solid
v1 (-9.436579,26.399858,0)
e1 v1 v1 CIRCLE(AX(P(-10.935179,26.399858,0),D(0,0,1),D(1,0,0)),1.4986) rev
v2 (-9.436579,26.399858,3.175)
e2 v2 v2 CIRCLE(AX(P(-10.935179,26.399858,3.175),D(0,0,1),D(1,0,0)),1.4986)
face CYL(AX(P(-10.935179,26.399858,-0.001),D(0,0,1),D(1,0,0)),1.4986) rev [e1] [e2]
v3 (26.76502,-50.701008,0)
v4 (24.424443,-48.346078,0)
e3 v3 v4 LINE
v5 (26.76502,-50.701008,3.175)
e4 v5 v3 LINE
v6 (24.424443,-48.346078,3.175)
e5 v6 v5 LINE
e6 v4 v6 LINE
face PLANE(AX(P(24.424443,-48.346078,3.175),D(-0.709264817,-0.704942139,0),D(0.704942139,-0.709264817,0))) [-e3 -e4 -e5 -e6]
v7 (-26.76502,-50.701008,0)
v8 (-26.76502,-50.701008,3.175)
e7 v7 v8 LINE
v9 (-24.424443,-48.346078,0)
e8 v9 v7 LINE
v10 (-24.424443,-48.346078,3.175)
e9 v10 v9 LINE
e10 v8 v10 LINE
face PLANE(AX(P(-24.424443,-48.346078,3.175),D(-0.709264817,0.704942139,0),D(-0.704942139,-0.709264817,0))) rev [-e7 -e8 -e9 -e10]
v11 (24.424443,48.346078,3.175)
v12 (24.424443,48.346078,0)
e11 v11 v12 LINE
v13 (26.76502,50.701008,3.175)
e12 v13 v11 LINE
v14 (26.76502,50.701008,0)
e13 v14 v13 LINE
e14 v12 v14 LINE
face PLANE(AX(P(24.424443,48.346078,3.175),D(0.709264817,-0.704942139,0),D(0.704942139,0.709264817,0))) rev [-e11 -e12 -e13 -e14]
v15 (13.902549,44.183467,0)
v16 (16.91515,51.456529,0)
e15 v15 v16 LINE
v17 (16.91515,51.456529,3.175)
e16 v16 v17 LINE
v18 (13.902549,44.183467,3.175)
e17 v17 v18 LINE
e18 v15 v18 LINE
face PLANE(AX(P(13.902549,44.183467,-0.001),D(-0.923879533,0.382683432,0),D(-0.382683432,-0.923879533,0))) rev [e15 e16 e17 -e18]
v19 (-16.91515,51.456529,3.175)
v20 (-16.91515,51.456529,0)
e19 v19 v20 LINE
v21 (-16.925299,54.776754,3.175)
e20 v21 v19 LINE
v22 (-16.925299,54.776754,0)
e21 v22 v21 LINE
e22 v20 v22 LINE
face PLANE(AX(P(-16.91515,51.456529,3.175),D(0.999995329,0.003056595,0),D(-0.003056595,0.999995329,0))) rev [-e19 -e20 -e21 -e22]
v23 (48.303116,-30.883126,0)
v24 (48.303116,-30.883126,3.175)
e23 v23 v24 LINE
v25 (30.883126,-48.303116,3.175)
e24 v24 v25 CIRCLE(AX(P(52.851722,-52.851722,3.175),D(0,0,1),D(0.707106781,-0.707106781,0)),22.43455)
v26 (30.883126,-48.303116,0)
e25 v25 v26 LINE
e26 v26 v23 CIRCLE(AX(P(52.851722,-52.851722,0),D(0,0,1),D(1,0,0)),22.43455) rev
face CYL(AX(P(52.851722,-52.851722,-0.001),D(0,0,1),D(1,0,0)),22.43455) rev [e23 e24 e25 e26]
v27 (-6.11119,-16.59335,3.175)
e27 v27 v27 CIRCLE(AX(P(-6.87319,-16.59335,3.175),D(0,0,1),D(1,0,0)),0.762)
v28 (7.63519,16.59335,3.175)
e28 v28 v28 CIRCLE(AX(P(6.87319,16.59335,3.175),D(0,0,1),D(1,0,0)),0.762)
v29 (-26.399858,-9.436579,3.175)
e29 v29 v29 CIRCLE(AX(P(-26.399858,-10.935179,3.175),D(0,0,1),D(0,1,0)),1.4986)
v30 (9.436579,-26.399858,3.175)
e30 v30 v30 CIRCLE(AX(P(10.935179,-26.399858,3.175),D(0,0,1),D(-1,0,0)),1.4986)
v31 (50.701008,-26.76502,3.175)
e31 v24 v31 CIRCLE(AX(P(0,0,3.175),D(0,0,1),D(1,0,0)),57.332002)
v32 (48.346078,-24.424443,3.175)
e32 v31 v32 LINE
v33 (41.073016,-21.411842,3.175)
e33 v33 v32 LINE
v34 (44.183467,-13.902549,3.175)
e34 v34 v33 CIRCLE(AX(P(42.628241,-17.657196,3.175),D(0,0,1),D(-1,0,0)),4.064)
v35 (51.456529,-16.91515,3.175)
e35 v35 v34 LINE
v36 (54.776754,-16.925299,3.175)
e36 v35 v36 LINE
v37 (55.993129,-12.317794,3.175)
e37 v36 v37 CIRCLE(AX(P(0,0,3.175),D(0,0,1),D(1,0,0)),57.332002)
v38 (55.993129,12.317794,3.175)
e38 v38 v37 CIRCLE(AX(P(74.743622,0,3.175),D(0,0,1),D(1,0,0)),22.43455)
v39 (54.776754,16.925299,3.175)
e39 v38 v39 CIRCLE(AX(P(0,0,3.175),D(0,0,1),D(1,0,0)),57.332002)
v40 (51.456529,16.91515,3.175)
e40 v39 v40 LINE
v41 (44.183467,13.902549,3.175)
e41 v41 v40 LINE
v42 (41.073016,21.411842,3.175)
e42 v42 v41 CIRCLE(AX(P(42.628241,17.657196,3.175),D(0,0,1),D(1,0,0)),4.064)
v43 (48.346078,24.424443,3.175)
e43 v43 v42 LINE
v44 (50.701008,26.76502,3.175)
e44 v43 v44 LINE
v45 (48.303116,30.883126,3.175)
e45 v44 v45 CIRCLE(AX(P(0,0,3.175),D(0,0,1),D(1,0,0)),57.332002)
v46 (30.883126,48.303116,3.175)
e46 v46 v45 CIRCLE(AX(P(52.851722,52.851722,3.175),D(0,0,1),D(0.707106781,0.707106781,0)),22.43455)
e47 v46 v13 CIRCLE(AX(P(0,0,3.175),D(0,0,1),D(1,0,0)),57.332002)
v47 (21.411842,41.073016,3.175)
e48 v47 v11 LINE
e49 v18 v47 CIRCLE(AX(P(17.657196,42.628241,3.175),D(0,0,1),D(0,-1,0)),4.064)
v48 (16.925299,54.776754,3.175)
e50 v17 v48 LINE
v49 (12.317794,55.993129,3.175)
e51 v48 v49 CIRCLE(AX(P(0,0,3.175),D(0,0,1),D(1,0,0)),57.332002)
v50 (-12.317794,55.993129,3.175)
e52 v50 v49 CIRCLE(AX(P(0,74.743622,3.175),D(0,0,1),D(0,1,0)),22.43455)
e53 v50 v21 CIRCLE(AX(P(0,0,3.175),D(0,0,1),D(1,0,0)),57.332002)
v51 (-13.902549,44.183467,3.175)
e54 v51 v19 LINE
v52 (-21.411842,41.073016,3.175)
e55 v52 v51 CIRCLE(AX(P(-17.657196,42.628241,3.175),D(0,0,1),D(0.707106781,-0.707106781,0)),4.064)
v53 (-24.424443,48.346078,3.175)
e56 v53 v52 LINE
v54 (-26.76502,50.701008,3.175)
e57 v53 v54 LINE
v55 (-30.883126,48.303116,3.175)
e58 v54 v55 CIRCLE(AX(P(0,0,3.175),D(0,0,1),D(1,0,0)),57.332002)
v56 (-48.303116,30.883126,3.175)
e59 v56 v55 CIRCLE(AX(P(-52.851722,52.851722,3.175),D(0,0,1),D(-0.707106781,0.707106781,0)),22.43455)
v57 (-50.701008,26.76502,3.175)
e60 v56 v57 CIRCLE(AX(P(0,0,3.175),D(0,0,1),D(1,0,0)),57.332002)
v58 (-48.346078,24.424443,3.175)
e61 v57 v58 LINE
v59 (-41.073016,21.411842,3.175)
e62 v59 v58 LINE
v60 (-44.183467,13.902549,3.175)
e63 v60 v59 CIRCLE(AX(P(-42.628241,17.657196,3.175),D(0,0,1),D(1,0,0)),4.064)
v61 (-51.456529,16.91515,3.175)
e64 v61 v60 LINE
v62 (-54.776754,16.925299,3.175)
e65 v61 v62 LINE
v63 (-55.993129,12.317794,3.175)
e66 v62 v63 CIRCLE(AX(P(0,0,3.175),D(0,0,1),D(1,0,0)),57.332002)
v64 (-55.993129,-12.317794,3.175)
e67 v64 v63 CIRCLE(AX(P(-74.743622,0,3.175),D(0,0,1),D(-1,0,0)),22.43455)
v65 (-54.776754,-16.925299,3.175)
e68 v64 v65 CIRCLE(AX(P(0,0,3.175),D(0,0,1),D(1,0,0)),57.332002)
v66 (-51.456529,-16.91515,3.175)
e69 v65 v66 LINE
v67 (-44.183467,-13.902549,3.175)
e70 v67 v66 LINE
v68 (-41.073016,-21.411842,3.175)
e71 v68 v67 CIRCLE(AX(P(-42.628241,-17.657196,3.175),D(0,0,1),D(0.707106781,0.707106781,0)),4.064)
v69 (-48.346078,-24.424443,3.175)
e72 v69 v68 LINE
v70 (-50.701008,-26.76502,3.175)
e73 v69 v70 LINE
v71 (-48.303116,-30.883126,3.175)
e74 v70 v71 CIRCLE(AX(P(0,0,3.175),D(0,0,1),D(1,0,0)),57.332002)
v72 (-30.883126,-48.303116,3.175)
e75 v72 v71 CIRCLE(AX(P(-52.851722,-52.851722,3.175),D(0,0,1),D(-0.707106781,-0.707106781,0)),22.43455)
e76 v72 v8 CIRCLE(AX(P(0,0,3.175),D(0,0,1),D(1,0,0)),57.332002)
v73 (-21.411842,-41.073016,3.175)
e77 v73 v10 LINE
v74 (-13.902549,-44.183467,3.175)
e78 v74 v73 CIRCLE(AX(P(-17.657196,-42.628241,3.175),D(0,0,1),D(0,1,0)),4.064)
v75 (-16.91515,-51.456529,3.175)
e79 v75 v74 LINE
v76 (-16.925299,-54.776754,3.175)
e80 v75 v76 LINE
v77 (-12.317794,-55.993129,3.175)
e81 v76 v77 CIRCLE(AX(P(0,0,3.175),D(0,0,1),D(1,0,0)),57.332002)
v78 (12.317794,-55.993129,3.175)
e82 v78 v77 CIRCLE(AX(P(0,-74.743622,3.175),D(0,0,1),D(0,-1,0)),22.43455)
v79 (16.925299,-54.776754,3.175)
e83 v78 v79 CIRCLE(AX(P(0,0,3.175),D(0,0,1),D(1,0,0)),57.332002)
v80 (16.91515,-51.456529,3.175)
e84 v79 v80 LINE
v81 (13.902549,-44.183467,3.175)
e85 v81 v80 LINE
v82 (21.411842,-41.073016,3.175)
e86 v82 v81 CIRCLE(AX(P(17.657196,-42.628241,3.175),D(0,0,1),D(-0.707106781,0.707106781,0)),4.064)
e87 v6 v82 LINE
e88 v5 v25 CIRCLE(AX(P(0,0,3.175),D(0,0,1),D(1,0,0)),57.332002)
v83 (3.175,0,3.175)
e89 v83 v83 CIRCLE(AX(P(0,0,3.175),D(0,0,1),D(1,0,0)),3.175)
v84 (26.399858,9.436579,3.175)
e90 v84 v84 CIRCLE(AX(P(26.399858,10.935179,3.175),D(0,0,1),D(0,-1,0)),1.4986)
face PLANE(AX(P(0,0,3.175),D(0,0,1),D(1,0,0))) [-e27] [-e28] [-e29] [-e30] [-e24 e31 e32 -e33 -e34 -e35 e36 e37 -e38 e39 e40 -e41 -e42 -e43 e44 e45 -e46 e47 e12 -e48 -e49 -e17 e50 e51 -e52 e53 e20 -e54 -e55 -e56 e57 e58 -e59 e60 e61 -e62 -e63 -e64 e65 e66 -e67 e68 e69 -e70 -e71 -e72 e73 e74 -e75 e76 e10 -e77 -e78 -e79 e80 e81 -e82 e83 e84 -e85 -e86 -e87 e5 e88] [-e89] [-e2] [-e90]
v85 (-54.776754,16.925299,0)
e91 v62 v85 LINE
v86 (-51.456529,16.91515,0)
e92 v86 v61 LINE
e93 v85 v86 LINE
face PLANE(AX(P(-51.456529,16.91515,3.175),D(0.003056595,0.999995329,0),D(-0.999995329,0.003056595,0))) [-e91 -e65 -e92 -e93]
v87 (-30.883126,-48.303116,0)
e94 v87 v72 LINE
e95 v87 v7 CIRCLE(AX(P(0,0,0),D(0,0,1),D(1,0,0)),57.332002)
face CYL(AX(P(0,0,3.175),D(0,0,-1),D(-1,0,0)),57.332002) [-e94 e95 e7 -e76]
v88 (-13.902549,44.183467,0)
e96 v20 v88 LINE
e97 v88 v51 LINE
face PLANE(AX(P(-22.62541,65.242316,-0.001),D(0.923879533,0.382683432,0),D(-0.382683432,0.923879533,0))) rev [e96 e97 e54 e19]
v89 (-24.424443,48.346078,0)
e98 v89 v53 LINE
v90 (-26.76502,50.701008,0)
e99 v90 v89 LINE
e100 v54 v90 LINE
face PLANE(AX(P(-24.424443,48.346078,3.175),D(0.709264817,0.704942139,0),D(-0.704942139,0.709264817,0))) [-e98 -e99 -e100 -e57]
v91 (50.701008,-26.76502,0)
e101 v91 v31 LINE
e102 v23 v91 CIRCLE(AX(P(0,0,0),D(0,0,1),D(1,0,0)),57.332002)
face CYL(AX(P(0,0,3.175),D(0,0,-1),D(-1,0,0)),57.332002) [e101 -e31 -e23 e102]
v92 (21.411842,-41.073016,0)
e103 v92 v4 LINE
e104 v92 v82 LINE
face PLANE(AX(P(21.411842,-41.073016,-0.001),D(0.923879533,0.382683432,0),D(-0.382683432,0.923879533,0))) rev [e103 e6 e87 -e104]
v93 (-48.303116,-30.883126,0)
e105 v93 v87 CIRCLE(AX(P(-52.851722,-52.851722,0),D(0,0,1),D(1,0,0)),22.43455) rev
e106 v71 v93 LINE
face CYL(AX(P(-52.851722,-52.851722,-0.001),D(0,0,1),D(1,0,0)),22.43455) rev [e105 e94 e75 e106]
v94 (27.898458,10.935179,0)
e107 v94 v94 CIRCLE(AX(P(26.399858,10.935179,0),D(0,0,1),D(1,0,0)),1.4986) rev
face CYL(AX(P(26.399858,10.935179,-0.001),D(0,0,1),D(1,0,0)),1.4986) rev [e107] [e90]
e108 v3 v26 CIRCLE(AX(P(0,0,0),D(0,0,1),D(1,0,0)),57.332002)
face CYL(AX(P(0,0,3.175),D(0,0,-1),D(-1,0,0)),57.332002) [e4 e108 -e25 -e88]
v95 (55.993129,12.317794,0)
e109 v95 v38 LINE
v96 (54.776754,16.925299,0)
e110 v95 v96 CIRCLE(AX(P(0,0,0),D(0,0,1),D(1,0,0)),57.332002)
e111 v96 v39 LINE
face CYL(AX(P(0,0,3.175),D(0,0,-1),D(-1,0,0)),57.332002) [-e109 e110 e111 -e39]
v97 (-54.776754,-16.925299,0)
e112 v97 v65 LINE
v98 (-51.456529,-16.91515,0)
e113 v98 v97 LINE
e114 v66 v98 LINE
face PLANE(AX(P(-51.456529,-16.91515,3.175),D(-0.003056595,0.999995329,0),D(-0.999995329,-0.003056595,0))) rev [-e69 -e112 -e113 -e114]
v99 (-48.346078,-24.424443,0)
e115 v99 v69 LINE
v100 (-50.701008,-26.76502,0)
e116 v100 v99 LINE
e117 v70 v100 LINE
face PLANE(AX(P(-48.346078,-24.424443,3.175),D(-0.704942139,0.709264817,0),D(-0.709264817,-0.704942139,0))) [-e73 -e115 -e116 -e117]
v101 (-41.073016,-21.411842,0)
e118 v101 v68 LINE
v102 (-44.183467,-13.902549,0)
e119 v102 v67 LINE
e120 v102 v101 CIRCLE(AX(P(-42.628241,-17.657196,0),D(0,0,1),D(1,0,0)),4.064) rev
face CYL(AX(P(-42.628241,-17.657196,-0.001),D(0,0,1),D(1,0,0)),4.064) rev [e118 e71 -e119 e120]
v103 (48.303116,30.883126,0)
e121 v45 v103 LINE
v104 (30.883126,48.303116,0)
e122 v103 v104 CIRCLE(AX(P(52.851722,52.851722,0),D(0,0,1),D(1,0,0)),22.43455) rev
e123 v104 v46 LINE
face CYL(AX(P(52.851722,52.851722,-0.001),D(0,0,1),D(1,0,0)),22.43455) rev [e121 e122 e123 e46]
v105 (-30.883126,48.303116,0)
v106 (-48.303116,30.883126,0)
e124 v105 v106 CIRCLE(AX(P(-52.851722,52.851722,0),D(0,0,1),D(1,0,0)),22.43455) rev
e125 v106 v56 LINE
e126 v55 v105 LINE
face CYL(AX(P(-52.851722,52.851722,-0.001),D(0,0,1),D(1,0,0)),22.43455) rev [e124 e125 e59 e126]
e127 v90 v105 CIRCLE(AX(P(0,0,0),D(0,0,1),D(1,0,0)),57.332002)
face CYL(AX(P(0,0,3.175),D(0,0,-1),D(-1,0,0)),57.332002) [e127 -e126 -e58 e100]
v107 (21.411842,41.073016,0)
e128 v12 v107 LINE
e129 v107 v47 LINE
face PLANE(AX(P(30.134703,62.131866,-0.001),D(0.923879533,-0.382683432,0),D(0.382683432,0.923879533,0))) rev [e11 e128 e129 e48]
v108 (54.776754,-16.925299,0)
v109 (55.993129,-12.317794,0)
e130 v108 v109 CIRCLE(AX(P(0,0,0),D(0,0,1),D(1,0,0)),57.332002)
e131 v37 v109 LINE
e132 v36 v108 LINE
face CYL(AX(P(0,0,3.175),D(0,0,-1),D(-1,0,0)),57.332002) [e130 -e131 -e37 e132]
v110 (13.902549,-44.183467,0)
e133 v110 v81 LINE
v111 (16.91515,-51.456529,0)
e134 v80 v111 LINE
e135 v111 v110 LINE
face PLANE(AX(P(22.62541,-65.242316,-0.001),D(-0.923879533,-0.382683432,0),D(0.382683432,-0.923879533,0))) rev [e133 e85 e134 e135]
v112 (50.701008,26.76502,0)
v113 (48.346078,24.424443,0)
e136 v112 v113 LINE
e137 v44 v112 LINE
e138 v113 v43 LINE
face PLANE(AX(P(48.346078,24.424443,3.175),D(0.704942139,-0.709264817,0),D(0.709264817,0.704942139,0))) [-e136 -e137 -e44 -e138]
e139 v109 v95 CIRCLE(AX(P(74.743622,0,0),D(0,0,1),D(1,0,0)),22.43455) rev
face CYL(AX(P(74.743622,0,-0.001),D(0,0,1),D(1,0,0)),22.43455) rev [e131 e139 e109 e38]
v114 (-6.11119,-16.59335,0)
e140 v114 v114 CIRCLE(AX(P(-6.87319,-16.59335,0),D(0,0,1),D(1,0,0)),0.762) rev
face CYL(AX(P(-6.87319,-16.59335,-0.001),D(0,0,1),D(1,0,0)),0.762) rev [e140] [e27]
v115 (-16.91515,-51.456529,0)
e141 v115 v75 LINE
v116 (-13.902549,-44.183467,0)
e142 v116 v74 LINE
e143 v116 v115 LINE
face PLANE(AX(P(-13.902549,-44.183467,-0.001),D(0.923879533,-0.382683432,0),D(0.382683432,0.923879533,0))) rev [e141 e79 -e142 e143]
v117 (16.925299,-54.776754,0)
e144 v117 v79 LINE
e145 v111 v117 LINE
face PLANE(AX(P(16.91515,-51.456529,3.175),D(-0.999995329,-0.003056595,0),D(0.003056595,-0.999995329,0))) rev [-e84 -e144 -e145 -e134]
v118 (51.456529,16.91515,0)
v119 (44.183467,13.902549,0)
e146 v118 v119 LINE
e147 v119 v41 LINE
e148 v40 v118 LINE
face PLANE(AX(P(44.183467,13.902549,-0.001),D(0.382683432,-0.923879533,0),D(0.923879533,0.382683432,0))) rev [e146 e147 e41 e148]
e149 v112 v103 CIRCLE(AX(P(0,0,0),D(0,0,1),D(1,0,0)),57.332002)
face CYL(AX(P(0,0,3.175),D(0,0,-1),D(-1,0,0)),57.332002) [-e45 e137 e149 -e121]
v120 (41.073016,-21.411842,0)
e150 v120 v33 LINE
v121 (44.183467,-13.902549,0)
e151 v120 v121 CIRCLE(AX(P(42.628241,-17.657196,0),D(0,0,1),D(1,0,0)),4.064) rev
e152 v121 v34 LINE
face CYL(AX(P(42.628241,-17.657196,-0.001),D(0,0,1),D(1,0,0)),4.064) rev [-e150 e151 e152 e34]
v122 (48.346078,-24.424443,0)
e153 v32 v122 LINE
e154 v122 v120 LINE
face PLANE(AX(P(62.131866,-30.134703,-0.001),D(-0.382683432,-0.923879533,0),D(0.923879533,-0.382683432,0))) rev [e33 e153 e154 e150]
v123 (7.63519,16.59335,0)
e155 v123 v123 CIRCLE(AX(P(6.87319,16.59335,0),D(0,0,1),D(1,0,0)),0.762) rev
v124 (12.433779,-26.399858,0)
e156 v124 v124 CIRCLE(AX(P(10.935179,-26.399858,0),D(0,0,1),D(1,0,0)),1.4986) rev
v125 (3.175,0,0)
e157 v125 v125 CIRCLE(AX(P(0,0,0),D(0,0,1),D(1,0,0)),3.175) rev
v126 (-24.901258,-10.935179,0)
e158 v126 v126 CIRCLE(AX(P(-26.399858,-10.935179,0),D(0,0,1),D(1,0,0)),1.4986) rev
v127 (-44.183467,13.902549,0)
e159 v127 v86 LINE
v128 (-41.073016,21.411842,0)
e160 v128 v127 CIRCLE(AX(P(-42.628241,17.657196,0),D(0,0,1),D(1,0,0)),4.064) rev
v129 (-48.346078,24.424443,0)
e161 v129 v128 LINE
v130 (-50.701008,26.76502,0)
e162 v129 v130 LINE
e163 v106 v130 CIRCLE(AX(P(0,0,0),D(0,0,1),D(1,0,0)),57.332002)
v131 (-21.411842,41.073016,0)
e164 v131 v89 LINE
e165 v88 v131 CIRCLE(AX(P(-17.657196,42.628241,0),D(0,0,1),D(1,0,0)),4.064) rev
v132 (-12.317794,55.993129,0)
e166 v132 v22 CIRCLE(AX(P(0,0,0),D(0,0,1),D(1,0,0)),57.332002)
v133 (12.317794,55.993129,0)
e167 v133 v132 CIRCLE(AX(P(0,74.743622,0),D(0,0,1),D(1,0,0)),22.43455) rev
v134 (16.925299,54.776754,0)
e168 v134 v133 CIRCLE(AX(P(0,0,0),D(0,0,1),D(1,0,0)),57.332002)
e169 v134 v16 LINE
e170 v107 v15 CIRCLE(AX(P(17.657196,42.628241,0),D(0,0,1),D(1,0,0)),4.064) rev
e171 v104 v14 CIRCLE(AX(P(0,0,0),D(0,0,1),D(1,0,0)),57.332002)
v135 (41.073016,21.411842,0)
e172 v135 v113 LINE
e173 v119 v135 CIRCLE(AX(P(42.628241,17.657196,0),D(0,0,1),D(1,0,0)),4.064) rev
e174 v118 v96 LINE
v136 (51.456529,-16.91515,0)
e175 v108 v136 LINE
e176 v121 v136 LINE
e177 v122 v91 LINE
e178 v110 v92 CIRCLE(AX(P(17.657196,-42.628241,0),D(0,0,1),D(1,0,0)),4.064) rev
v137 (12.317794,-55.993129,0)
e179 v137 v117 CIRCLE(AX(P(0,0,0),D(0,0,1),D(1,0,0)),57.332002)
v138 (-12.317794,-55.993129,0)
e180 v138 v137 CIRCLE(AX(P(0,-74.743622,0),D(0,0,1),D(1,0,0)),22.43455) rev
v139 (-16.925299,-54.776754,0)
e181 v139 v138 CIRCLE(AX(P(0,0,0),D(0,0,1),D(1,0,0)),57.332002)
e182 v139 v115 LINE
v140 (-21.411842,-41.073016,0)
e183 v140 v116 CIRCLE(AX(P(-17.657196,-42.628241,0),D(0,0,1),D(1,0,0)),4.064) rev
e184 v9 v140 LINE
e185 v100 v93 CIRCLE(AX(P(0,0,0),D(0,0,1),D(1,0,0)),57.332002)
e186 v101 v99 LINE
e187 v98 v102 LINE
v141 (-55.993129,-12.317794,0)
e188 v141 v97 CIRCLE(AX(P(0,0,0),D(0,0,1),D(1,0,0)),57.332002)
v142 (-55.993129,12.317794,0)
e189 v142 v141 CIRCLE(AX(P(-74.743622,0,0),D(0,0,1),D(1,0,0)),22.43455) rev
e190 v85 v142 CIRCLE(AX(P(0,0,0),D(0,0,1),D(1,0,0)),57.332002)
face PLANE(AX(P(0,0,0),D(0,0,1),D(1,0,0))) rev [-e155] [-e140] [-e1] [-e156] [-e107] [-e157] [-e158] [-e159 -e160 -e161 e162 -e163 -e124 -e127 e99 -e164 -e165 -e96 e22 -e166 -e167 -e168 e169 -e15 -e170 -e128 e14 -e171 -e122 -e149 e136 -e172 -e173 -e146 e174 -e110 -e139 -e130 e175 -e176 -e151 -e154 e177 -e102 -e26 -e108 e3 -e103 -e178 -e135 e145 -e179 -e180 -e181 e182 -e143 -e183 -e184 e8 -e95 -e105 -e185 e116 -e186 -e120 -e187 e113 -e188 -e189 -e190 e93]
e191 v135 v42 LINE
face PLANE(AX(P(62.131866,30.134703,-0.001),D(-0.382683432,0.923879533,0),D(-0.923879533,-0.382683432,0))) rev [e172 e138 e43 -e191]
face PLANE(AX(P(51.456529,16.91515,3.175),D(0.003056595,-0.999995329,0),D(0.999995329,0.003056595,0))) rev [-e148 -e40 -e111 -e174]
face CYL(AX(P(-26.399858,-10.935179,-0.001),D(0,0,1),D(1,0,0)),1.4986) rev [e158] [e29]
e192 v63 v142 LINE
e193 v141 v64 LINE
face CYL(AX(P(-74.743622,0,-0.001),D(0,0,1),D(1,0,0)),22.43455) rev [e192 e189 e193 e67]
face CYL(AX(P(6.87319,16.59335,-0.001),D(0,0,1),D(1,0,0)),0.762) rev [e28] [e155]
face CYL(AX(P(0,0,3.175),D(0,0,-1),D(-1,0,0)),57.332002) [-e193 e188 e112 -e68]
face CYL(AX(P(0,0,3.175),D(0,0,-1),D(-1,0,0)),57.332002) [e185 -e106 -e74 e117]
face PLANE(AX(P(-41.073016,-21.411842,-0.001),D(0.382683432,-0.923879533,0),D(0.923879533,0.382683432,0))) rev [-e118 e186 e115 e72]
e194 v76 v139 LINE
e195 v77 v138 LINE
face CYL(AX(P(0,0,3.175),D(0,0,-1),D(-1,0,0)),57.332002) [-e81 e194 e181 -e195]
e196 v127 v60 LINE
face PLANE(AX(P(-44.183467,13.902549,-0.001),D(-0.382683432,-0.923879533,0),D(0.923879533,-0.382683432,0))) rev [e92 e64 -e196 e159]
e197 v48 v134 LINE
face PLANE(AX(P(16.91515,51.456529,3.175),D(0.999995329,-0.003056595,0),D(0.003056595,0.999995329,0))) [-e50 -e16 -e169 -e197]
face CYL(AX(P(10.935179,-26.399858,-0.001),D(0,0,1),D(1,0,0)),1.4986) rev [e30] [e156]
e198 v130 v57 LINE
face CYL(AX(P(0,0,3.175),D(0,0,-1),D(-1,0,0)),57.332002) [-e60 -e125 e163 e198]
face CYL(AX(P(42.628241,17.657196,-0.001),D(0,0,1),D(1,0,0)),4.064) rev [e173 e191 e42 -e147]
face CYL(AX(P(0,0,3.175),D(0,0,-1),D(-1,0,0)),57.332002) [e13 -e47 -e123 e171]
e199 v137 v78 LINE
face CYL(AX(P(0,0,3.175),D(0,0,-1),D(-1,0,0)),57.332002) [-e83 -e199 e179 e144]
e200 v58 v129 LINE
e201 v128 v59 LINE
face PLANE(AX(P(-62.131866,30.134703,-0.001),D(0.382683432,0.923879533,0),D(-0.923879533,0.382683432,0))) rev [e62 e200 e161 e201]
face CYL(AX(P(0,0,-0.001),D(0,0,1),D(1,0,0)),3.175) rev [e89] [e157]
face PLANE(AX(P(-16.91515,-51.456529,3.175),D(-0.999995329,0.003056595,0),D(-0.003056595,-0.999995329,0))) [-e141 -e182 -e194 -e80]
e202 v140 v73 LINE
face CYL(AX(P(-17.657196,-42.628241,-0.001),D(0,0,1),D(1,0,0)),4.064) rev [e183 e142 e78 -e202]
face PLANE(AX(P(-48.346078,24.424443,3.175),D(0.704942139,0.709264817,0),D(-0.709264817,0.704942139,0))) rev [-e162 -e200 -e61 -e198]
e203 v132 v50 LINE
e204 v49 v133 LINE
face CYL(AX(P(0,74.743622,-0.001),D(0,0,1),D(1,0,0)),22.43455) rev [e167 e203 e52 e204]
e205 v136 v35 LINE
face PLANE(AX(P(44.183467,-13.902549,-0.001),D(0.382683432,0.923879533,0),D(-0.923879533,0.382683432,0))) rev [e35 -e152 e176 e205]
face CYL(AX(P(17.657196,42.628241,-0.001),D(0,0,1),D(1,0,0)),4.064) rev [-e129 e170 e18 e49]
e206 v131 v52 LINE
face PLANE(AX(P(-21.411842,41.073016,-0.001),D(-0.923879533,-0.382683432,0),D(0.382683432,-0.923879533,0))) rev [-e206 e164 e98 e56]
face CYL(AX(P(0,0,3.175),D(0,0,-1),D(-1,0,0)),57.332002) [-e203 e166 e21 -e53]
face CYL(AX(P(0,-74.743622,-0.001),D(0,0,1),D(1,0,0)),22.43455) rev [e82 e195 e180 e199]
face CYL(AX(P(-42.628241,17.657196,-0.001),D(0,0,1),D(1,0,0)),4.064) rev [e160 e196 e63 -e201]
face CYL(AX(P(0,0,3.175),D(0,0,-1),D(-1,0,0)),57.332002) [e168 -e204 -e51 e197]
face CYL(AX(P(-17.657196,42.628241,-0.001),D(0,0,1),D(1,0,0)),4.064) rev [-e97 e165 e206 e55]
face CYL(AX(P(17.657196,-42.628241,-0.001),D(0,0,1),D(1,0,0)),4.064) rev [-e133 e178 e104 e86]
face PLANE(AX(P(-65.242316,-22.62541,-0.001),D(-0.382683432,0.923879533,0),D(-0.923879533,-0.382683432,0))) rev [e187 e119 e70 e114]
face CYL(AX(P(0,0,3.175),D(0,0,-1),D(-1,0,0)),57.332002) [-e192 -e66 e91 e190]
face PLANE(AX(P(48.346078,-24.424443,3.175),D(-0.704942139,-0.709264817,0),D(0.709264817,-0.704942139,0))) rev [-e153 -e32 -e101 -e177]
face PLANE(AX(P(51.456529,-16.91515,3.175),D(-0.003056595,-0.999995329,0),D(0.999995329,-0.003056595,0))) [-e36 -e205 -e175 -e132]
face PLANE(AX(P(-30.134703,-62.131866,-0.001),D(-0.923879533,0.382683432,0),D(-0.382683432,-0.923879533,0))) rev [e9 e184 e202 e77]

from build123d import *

# Parameters (mm, degrees)
SKETCH1_R           = 57.332002373
BOSS_EXTRUDE1_DEPTH = 3.175
CUT_EXTRUDE1_START  = -3.175
CUT_EXTRUDE1_DEPTH  = 3.175
CIRPATTERN1_COUNT   = 8
CUT_EXTRUDE2_REACH  = 81.25
SKETCH3_R           = 3.175
CUT_EXTRUDE3_REACH  = 81.25
SKETCH4_R           = 0.762
CHAMFER1_SIZE       = 3.175
CUT_EXTRUDE4_REACH  = 81.25
SKETCH5_R           = 1.4986
CIRPATTERN2_COUNT   = 4


with BuildPart() as part:
    # Sketch1 → Boss-Extrude1 (new body)
    with BuildSketch(Plane.XY):
        Circle(SKETCH1_R)
    extrude(amount=BOSS_EXTRUDE1_DEPTH)

    # Sketch2 → Cut-Extrude1 (cut)
    with BuildSketch(Plane.XY.offset(3.175).offset(CUT_EXTRUDE1_START)):
        with BuildLine():
            Line((62.131865528, 30.134703259), (41.073015989, 21.411842172))
            ThreePointArc((41.073015989, 21.411842172), (38.873595038, 16.101970283), (44.183466927, 13.902549332))
            Line((44.183466927, 13.902549332), (54.389846688, 18.130170251))
            ThreePointArc((54.389846688, 18.130170251), (55.267949497, 15.245073122), (55.99312865, 12.317793637))
            ThreePointArc((55.99312865, 12.317793637), (52.309071806, 0), (55.99312865, -12.317793637))
            ThreePointArc((55.99312865, -12.317793637), (55.267949497, -15.245073122), (54.389846688, -18.130170251))
            Line((54.389846688, -18.130170251), (44.183466927, -13.902549332))
            ThreePointArc((44.183466927, -13.902549332), (38.873595038, -16.101970283), (41.073015989, -21.411842172))
            Line((41.073015989, -21.411842172), (62.131865528, -30.134703259))
            ThreePointArc((62.131865528, -30.134703259), (69.054102373, 0), (62.131865528, 30.134703259))
        make_face()
    cut_extrude1 = extrude(amount=CUT_EXTRUDE1_DEPTH, mode=Mode.SUBTRACT)

    # CirPattern1: Cut-Extrude1 ×8 about axis
    cirpattern1_axis = Axis((0, 0, 0), (0, 0, 1))
    for i in range(1, CIRPATTERN1_COUNT):
        add(cut_extrude1.rotate(cirpattern1_axis, i * 360 / CIRPATTERN1_COUNT), mode=Mode.SUBTRACT)

    # Sketch3 → Cut-Extrude2 (cut, up to next)
    with BuildSketch(Plane.XY.offset(3.175), mode=Mode.PRIVATE) as cut_extrude2_sk1:
        Circle(SKETCH3_R)
    cut_extrude2_tool1 = extrude(cut_extrude2_sk1.sketch, amount=-CUT_EXTRUDE2_REACH, mode=Mode.PRIVATE) & part.part
    add(cut_extrude2_tool1.solids().sort_by_distance((0, 0, 3.175))[0], mode=Mode.SUBTRACT)

    # Sketch4 → Cut-Extrude3 (cut, up to next)
    with BuildSketch(Plane.XY.offset(3.175), mode=Mode.PRIVATE) as cut_extrude3_sk1:
        with Locations((6.873190472, 16.593349654)):
            Circle(SKETCH4_R)
    cut_extrude3_tool1 = extrude(cut_extrude3_sk1.sketch, amount=-CUT_EXTRUDE3_REACH, mode=Mode.PRIVATE) & part.part
    # Sketch4 → Cut-Extrude3 (cut, up to next)
    with BuildSketch(Plane.XY.offset(3.175), mode=Mode.PRIVATE) as cut_extrude3_sk2:
        with Locations((-6.873190472, -16.593349654)):
            Circle(SKETCH4_R)
    cut_extrude3_tool2 = extrude(cut_extrude3_sk2.sketch, amount=-CUT_EXTRUDE3_REACH, mode=Mode.PRIVATE) & part.part
    add(cut_extrude3_tool1.solids().sort_by_distance((6.87319, 16.59335, 3.175))[0], mode=Mode.SUBTRACT)
    add(cut_extrude3_tool2.solids().sort_by_distance((-6.87319, -16.59335, 3.175))[0], mode=Mode.SUBTRACT)

    # Chamfer1
    # the kernel refuses this chamfer: 3.175, 1.27 mm, written as the material it takes off along each edge
    with BuildSketch(Plane(origin=(-51.279395749, 25.639463092, -8.232085276), x_dir=(0.4570542890286377, 0.8894387988392043, 0), z_dir=(0, 0, 1)), Plane(origin=(-18.130170251, 54.389846688, -8.232085276), x_dir=(0.9521143932521638, 0.3057420189670758, 0), z_dir=(0, 0, 1)), Plane(origin=(25.639463092, 51.279395749, -8.232085276), x_dir=(0.8894387988392037, -0.4570542890286388, 0), z_dir=(0, 0, 1)), Plane(origin=(54.389846688, 18.130170251, -8.232085276), x_dir=(0.30574201896707504, -0.9521143932521642, 0), z_dir=(0, 0, 1)), Plane(origin=(25.639463092, -51.279395749, 11.407085276), x_dir=(0.8894387988391999, 0.45705428902864664, 0), z_dir=(0, 0, -1)), Plane(origin=(-18.130170251, -54.389846688, 11.407085276), x_dir=(0.952114393252168, -0.305742018967063, 0), z_dir=(0, 0, -1)), Plane(origin=(-51.279395749, -25.639463092, 11.407085276), x_dir=(0.4570542890286467, -0.8894387988391996, 0), z_dir=(0, 0, -1))) as chamfer1_piece_1:
        with BuildLine():
            Line((1.265469022, 0), (CHAMFER1_SIZE * 0.0818896104616, -CHAMFER1_SIZE * 0.996641405772))
            Line((CHAMFER1_SIZE * 0.0818896104616, -CHAMFER1_SIZE * 0.996641405772), (0, 0))
            ThreePointArc((0, 0), (0.65194513, 0.003488419), (1.265469022, 0))
        make_face()
    extrude(amount=19.639170553, mode=Mode.SUBTRACT)
    with BuildSketch(Plane(origin=(-54.389846688, 18.130170251, 11.407085276), x_dir=(0.9238795325112874, -0.3826834323650885, 0), z_dir=(0, 0, -1)), Plane(origin=(-25.639463092, 51.279395749, 11.407085276), x_dir=(0.3826834323650902, -0.9238795325112866, 0), z_dir=(0, 0, -1)), Plane(origin=(18.130170251, 54.389846688, 11.407085276), x_dir=(-0.3826834323650892, -0.923879532511287, 0), z_dir=(0, 0, -1)), Plane(origin=(51.279395749, 25.639463092, 11.407085276), x_dir=(-0.9238795325112859, -0.38268343236509195, 0), z_dir=(0, 0, -1)), Plane(origin=(18.130170251, -54.389846688, -8.232085276), x_dir=(-0.38268343236509117, 0.9238795325112862, 0), z_dir=(0, 0, 1)), Plane(origin=(-25.639463092, -51.279395749, -8.232085276), x_dir=(0.3826834323650892, 0.923879532511287, 0), z_dir=(0, 0, 1)), Plane(origin=(-54.389846688, -18.130170251, -8.232085276), x_dir=(0.9238795325112866, 0.3826834323650902, 0), z_dir=(0, 0, 1))) as chamfer1_piece_2:
        with BuildLine():
            Line((CHAMFER1_SIZE, 0), (0.103628765, 1.261218825))
            ThreePointArc((0.103628765, 1.261218825), (0.04991083, 0.650041176), (0, 0))
            Line((0, 0), (CHAMFER1_SIZE, 0))
        make_face()
    extrude(amount=19.639170553, mode=Mode.SUBTRACT)
    with BuildSketch(Plane(origin=(51.279395749, -25.639463092, 11.407085276), x_dir=(-0.9238795325112863, 0.382683432365091, 0), z_dir=(0, 0, -1))) as chamfer1_piece_3:
        with BuildLine():
            Line((CHAMFER1_SIZE, 0), (0.103628765, -1.261218825))
            ThreePointArc((0.103628765, -1.261218825), (0.04991083, -0.650041176), (0, 0))
            Line((0, 0), (CHAMFER1_SIZE, 0))
        make_face()
    extrude(amount=19.639170553, mode=Mode.SUBTRACT)
    with BuildSketch(Plane(origin=(54.389846688, -18.130170251, -8.232085276), x_dir=(0.3057420189670742, 0.9521143932521645, 0), z_dir=(0, 0, 1))) as chamfer1_piece_4:
        with BuildLine():
            Line((1.265469022, 0), (CHAMFER1_SIZE * 0.0818896104616, CHAMFER1_SIZE * 0.996641405772))
            Line((CHAMFER1_SIZE * 0.0818896104616, CHAMFER1_SIZE * 0.996641405772), (0, 0))
            ThreePointArc((0, 0), (0.65194513, -0.003488419), (1.265469022, 0))
        make_face()
    extrude(amount=19.639170553, mode=Mode.SUBTRACT)

    # Sketch5 → Cut-Extrude4 (cut, up to next)
    with BuildSketch(Plane.XY.offset(3.175), mode=Mode.PRIVATE) as cut_extrude4_sk1:
        with Locations((-10.93517908, 26.399857642)):
            Circle(SKETCH5_R)
    cut_extrude4_tool1 = extrude(cut_extrude4_sk1.sketch, amount=-CUT_EXTRUDE4_REACH, mode=Mode.PRIVATE) & part.part
    cut_extrude4 = cut_extrude4_tool1.solids().sort_by_distance((-10.935179, 26.399858, 3.175))[0]
    add(cut_extrude4, mode=Mode.SUBTRACT)

    # CirPattern2: Cut-Extrude4 ×4 about axis
    cirpattern2_axis = Axis((0, 0, 0), (0, 0, 1))
    for i in range(1, CIRPATTERN2_COUNT):
        add(cut_extrude4.rotate(cirpattern2_axis, i * 360 / CIRPATTERN2_COUNT), mode=Mode.SUBTRACT)


solid = part.part
